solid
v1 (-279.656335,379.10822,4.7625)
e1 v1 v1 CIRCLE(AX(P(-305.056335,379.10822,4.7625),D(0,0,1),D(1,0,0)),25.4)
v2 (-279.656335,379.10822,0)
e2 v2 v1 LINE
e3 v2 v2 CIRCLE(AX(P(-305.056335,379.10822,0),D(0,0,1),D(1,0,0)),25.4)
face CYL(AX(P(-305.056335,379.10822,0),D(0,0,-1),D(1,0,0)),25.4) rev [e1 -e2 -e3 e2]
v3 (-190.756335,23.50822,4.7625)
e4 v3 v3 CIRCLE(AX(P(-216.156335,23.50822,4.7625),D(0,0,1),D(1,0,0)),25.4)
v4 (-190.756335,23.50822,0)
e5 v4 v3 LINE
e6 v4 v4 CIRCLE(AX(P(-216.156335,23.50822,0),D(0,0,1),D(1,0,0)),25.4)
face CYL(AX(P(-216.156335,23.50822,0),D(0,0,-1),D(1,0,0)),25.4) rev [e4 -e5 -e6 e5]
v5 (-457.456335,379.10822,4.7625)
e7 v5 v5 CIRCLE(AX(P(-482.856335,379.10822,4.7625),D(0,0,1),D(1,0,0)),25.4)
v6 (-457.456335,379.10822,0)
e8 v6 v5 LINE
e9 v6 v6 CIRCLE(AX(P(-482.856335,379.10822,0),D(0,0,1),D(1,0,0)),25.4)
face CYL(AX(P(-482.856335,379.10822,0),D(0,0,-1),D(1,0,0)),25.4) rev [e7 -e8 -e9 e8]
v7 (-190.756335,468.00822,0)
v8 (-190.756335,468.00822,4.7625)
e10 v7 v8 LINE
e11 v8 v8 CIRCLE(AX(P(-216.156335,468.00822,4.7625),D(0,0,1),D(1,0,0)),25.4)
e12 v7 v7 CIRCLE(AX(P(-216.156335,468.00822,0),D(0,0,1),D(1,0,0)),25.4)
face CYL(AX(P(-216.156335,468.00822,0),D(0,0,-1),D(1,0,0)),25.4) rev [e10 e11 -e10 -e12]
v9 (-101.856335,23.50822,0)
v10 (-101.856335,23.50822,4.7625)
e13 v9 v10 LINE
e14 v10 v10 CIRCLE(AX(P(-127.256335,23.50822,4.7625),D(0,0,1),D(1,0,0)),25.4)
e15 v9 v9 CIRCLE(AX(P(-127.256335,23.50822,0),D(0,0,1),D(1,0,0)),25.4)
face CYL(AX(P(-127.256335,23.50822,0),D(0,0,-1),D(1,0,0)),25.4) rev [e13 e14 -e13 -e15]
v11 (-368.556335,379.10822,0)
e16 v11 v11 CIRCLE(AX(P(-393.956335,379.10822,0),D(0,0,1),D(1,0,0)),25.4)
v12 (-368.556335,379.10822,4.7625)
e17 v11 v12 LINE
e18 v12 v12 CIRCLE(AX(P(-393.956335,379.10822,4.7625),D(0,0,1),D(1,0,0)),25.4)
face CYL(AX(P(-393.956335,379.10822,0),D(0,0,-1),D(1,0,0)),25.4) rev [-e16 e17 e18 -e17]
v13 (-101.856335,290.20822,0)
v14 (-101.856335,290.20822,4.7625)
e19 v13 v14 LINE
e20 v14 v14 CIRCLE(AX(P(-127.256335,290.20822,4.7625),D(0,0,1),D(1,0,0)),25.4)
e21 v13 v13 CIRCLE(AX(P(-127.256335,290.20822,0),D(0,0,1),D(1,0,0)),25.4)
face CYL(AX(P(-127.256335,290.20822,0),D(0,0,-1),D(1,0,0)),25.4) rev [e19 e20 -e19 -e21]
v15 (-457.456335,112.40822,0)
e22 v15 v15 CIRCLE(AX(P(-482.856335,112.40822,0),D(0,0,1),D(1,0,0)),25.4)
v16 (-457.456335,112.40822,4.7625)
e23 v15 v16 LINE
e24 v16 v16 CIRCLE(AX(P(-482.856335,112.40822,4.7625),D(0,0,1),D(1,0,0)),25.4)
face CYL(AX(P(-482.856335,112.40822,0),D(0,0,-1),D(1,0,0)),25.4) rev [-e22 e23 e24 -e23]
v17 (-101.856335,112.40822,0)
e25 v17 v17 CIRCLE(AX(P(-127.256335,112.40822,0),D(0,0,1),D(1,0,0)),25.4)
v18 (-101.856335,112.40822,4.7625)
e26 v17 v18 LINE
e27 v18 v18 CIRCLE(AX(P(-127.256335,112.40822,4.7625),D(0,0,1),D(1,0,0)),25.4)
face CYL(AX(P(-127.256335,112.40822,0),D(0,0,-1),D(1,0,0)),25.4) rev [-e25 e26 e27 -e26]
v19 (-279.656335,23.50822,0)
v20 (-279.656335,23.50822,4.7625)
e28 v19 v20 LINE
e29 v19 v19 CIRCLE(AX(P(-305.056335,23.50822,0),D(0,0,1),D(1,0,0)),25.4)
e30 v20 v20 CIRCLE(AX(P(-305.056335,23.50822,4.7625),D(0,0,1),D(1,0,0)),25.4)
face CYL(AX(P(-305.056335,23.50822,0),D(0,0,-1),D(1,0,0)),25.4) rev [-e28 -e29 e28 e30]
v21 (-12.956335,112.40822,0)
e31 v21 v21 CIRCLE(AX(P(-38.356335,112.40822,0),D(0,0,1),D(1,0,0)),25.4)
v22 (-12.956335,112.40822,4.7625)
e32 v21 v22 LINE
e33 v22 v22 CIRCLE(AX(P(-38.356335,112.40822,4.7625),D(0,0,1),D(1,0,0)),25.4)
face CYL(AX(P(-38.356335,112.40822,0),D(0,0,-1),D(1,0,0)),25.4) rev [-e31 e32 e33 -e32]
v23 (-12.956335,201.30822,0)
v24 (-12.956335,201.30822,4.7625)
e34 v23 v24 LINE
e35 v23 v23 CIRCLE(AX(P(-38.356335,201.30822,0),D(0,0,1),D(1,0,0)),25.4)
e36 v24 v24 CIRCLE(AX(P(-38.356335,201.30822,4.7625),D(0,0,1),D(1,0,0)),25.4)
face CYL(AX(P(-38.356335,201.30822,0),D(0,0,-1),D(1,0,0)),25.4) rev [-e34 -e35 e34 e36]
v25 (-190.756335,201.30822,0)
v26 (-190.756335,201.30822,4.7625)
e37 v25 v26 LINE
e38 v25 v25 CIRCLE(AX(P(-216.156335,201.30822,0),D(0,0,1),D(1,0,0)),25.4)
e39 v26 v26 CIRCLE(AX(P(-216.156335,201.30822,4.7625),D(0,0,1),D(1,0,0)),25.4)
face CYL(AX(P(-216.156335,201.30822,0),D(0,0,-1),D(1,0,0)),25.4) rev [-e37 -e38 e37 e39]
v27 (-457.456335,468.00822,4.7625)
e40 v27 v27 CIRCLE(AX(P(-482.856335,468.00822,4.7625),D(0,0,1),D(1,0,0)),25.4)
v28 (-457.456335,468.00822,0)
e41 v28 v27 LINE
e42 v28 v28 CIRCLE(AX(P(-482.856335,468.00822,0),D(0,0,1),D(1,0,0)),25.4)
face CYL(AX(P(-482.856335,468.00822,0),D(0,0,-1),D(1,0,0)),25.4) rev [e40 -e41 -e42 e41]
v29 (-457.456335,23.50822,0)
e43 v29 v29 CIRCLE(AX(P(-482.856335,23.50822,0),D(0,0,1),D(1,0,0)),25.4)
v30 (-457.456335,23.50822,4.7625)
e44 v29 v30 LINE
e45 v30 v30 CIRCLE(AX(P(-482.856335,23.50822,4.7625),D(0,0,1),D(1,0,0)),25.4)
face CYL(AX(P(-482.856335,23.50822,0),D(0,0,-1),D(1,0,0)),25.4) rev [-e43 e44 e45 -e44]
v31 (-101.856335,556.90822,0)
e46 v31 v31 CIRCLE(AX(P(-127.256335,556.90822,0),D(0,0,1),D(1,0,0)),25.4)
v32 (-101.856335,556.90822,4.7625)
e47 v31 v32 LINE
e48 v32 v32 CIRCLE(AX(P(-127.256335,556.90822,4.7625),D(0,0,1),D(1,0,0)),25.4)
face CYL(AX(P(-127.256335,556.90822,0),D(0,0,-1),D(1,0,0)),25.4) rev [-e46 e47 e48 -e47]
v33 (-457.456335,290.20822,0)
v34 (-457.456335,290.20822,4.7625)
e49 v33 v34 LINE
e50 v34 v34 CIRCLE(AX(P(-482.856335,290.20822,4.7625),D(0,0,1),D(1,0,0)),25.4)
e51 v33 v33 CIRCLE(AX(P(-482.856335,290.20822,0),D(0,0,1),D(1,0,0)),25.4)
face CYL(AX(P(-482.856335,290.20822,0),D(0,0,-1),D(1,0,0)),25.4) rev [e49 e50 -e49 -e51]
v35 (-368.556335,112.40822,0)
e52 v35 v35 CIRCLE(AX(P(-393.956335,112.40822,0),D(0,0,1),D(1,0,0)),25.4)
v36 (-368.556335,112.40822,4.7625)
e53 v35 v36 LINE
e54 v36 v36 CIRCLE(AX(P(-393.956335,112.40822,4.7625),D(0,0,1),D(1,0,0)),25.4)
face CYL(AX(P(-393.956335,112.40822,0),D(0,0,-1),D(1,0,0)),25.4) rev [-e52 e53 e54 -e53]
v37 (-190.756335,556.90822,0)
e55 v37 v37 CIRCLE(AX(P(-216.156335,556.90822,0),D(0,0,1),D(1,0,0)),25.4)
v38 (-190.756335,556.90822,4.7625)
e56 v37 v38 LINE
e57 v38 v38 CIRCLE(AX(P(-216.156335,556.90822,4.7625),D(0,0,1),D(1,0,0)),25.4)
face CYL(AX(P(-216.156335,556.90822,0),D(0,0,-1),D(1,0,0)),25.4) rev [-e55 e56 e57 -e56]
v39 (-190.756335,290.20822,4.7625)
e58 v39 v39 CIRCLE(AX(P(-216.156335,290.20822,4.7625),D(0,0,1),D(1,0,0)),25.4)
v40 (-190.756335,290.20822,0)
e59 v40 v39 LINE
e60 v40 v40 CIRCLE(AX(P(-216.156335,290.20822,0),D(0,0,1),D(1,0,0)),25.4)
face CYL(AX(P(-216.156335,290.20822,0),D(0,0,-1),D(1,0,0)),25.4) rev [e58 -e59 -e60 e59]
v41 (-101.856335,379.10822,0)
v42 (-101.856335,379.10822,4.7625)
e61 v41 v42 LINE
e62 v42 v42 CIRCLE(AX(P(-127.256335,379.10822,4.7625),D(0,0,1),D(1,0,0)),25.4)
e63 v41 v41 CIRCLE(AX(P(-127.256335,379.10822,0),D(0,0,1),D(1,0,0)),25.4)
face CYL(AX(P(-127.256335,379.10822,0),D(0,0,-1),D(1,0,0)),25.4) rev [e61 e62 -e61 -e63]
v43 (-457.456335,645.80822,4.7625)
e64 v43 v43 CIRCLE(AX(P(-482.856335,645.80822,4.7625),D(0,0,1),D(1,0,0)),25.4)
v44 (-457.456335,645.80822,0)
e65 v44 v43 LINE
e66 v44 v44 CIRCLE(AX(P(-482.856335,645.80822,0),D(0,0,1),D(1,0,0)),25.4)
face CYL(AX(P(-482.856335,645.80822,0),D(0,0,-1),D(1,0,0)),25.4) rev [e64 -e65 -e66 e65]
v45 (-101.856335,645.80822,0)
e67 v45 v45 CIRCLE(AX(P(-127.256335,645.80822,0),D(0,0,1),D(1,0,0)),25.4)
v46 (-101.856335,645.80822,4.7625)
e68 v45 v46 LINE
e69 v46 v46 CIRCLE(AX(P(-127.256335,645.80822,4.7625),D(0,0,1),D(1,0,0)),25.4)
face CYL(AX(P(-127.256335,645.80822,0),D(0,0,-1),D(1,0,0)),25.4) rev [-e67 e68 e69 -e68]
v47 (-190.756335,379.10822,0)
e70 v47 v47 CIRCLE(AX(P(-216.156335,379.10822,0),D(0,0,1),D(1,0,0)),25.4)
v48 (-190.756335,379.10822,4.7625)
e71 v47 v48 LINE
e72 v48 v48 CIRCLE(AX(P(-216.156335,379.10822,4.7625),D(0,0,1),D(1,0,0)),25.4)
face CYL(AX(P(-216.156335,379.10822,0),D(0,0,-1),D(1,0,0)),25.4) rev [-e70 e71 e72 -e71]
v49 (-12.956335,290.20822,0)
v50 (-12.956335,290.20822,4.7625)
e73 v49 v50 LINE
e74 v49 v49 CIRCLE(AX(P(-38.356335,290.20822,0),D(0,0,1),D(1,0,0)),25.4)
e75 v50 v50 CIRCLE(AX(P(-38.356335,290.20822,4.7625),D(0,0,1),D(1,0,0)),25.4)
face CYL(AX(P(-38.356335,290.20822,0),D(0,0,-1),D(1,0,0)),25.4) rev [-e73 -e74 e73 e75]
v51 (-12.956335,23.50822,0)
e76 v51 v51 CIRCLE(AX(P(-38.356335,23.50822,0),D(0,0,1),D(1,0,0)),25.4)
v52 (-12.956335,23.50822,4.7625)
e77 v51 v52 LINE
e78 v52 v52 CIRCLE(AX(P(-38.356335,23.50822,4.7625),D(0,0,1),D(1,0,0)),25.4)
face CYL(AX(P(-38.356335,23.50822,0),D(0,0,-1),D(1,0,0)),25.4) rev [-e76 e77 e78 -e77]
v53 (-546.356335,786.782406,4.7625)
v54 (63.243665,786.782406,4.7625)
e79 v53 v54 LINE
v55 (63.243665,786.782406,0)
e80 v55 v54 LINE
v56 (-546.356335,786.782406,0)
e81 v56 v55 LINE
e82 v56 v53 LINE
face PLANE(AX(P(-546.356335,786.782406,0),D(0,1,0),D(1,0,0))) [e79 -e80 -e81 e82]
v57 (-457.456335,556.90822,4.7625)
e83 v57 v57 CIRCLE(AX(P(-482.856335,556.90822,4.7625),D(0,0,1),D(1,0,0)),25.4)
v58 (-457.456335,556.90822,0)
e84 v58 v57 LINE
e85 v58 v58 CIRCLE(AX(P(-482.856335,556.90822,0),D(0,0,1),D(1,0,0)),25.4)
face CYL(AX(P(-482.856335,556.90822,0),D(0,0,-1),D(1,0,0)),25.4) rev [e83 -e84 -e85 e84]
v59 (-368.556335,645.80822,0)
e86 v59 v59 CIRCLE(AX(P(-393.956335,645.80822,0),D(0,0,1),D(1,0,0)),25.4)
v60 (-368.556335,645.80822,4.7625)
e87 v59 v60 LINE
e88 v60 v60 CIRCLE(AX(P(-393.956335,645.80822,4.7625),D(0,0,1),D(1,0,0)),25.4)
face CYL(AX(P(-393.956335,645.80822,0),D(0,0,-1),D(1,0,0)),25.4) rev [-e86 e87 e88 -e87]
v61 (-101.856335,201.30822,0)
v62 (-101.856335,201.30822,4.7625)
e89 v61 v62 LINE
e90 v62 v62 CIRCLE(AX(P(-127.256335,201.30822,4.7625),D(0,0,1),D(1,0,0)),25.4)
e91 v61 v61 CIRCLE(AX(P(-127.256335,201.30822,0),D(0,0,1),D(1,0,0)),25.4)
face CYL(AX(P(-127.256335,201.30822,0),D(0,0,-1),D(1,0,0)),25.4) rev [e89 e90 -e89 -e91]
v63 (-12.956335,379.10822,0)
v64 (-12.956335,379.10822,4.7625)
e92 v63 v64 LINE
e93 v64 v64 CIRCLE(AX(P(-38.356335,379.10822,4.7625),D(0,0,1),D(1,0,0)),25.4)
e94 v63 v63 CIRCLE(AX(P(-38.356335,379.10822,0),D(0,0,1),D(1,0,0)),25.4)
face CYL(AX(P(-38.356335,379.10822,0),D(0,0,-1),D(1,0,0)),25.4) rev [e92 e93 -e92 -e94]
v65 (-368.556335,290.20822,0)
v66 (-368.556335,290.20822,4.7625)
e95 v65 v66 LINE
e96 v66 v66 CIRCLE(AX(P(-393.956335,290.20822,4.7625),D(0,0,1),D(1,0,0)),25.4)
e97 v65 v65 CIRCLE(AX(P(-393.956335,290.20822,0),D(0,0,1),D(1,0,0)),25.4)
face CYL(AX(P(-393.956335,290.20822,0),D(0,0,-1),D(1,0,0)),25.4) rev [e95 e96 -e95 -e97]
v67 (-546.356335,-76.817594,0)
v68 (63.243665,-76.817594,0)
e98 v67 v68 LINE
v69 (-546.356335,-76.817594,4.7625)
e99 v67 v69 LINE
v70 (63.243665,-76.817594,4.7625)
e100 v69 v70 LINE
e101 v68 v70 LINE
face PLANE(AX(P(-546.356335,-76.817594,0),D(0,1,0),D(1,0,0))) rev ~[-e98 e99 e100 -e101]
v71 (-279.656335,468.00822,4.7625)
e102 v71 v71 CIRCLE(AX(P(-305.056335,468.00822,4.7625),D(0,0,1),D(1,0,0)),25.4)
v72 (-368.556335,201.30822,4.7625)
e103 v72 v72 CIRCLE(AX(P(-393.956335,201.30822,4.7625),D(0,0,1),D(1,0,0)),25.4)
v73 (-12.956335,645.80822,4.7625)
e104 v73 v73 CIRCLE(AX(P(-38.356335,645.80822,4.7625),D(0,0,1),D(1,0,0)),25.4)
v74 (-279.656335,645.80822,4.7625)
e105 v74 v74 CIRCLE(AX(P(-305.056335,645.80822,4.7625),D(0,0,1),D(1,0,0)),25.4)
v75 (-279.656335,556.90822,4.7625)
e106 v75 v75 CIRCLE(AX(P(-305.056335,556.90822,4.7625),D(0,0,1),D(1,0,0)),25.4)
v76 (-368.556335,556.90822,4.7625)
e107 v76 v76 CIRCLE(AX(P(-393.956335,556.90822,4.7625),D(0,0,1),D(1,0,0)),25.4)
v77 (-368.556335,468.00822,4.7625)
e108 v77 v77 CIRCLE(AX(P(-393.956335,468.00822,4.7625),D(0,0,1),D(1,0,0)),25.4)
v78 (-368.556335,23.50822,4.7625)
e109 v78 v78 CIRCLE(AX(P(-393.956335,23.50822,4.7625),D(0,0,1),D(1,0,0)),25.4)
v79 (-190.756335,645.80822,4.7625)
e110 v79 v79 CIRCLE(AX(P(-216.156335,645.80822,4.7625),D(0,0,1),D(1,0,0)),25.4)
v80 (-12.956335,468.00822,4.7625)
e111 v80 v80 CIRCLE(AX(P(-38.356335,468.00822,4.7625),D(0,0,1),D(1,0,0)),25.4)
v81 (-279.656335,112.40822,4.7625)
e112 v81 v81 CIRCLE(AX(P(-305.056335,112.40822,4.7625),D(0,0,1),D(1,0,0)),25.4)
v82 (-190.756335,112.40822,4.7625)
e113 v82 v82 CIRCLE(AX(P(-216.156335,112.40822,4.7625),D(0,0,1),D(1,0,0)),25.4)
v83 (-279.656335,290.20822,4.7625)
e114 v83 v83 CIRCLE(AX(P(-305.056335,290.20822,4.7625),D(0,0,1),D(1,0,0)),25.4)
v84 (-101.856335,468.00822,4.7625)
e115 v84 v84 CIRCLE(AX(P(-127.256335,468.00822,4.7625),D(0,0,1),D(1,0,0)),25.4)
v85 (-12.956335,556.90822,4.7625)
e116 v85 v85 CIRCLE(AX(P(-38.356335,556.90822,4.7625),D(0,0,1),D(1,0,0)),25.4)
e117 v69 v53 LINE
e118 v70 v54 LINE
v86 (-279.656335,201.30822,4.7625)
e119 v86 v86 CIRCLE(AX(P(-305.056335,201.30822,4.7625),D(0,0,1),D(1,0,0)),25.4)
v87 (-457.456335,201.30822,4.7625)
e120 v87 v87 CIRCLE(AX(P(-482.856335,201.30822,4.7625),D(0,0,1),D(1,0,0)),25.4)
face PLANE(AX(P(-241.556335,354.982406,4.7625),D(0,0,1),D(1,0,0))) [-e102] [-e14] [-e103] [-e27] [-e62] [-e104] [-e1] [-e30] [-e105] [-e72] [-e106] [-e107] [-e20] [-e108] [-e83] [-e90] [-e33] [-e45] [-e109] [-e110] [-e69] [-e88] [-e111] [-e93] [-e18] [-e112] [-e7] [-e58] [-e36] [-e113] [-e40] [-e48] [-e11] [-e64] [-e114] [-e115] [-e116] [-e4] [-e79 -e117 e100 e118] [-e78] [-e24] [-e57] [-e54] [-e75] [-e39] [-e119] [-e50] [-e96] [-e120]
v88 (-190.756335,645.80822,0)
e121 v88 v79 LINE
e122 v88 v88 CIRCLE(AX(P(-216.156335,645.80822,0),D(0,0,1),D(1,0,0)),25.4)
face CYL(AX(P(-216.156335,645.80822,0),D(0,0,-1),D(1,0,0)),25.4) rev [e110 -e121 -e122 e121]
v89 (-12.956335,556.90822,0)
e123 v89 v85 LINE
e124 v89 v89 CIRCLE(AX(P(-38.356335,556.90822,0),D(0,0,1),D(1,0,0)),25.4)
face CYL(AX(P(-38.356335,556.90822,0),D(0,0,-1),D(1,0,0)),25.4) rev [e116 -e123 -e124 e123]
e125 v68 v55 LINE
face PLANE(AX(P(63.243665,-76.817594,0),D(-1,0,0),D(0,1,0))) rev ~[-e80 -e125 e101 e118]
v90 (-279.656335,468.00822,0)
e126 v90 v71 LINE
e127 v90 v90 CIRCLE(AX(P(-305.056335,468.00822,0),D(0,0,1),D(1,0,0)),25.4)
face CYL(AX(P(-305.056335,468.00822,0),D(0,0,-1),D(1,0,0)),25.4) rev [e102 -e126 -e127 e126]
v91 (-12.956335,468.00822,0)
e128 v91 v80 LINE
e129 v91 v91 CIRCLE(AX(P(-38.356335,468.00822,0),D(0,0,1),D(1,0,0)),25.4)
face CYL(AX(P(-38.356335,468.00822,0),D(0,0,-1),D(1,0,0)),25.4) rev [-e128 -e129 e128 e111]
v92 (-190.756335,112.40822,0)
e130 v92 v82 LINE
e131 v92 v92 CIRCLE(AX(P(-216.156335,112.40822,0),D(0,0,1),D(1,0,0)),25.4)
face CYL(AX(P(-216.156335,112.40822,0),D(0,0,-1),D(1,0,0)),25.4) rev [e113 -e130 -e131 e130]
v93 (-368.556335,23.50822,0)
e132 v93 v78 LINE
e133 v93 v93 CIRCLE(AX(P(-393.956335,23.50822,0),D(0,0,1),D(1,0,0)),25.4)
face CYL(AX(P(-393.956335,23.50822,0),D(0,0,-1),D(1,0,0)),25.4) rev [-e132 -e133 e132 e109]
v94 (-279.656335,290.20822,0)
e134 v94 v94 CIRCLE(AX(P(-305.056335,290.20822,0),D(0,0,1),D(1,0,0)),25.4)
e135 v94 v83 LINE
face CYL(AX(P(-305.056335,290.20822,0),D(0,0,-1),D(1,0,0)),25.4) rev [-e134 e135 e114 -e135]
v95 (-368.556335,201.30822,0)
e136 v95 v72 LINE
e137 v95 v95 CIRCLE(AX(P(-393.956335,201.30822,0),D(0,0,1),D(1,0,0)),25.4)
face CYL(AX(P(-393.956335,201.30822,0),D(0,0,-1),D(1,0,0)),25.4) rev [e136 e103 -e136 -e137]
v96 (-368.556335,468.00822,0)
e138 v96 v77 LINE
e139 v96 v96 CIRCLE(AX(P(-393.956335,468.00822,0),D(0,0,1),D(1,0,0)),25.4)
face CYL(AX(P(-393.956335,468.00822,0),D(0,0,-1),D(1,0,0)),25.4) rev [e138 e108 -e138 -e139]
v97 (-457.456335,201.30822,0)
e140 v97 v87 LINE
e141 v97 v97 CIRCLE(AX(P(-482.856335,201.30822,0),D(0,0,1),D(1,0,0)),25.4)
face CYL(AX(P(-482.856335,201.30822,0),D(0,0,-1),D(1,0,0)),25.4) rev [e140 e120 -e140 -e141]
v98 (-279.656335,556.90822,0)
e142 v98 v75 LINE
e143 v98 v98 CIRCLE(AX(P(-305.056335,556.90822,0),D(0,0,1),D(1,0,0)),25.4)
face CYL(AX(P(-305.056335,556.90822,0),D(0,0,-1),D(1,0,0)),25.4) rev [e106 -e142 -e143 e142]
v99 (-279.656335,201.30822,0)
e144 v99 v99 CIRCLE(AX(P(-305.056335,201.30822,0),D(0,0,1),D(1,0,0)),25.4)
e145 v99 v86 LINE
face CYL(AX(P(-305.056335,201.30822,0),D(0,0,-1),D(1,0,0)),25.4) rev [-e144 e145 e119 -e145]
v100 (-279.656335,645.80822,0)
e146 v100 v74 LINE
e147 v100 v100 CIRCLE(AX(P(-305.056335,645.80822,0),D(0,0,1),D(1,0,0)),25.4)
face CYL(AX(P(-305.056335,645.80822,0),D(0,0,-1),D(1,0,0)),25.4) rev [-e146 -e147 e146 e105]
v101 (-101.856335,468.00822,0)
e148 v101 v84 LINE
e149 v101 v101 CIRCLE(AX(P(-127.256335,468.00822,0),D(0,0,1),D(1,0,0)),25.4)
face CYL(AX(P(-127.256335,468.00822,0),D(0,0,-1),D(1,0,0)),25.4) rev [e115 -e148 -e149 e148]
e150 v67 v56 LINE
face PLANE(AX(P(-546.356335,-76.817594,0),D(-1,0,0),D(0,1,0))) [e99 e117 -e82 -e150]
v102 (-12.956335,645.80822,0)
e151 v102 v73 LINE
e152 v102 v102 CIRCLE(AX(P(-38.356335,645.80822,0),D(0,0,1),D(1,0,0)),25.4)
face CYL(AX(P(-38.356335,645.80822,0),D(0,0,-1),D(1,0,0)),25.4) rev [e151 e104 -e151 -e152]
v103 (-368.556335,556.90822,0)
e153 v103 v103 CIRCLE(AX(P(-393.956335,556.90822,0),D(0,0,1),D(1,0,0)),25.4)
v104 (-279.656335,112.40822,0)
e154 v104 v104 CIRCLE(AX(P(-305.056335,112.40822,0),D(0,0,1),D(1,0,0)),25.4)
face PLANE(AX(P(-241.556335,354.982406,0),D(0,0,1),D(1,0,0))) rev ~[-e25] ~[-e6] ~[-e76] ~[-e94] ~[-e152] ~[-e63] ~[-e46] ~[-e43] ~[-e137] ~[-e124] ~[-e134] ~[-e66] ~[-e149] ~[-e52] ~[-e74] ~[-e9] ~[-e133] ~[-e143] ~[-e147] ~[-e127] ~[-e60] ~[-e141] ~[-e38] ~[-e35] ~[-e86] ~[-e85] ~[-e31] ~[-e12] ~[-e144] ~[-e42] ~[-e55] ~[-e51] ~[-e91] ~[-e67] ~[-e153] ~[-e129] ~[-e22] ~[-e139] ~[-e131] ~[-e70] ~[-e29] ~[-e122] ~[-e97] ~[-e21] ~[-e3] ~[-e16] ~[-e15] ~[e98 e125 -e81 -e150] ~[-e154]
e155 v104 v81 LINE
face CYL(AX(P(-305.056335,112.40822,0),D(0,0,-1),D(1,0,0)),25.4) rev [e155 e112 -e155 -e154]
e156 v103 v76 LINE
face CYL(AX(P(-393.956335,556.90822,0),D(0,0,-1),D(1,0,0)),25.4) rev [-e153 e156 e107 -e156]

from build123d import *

# Parameters (mm, degrees)
F0_W     = 609.6
F0_H     = 863.6
F0_R     = 25.4
F1_DEPTH = 4.7625


# Not quite as in the source:
# - a length typed as a fraction of an inch, garbled in the dataset ("3 / 203.2 mm" for 3/8 in), is restored


with BuildPart() as f1:
    # F0 (on Top) → F1 (new body)
    with BuildSketch(Plane.XY):
        with Locations((-241.5563351989, 354.9824055314)):
            Rectangle(F0_W, F0_H)
        with Locations((-482.8563351989, 23.5082199097)):
            Circle(F0_R, mode=Mode.SUBTRACT)
        with Locations((-393.9563351989, 23.5082199097)):
            Circle(F0_R, mode=Mode.SUBTRACT)
        with Locations((-482.8563351989, 112.4082199097)):
            Circle(F0_R, mode=Mode.SUBTRACT)
        with Locations((-393.9563351989, 112.4082199097)):
            Circle(F0_R, mode=Mode.SUBTRACT)
        with Locations((-305.0563351989, 23.5082199097)):
            Circle(F0_R, mode=Mode.SUBTRACT)
        with Locations((-305.0563351989, 112.4082199097)):
            Circle(F0_R, mode=Mode.SUBTRACT)
        with Locations((-482.8563351989, 201.3082199097)):
            Circle(F0_R, mode=Mode.SUBTRACT)
        with Locations((-393.9563351989, 201.3082199097)):
            Circle(F0_R, mode=Mode.SUBTRACT)
        with Locations((-482.8563351989, 290.2082199097)):
            Circle(F0_R, mode=Mode.SUBTRACT)
        with Locations((-393.9563351989, 290.2082199097)):
            Circle(F0_R, mode=Mode.SUBTRACT)
        with Locations((-305.0563351989, 201.3082199097)):
            Circle(F0_R, mode=Mode.SUBTRACT)
        with Locations((-305.0563351989, 290.2082199097)):
            Circle(F0_R, mode=Mode.SUBTRACT)
        with Locations((-216.1563351989, 23.5082199097)):
            Circle(F0_R, mode=Mode.SUBTRACT)
        with Locations((-127.2563351989, 23.5082199097)):
            Circle(F0_R, mode=Mode.SUBTRACT)
        with Locations((-216.1563351989, 112.4082199097)):
            Circle(F0_R, mode=Mode.SUBTRACT)
        with Locations((-127.2563351989, 112.4082199097)):
            Circle(F0_R, mode=Mode.SUBTRACT)
        with Locations((-38.3563351989, 23.5082199097)):
            Circle(F0_R, mode=Mode.SUBTRACT)
        with Locations((-38.3563351989, 112.4082199097)):
            Circle(F0_R, mode=Mode.SUBTRACT)
        with Locations((-216.1563351989, 201.3082199097)):
            Circle(F0_R, mode=Mode.SUBTRACT)
        with Locations((-127.2563351989, 201.3082199097)):
            Circle(F0_R, mode=Mode.SUBTRACT)
        with Locations((-216.1563351989, 290.2082199097)):
            Circle(F0_R, mode=Mode.SUBTRACT)
        with Locations((-127.2563351989, 290.2082199097)):
            Circle(F0_R, mode=Mode.SUBTRACT)
        with Locations((-38.3563351989, 201.3082199097)):
            Circle(F0_R, mode=Mode.SUBTRACT)
        with Locations((-38.3563351989, 290.2082199097)):
            Circle(F0_R, mode=Mode.SUBTRACT)
        with Locations((-482.8563351989, 379.1082199097)):
            Circle(F0_R, mode=Mode.SUBTRACT)
        with Locations((-393.9563351989, 379.1082199097)):
            Circle(F0_R, mode=Mode.SUBTRACT)
        with Locations((-482.8563351989, 468.0082199097)):
            Circle(F0_R, mode=Mode.SUBTRACT)
        with Locations((-482.8563351989, 556.9082199097)):
            Circle(F0_R, mode=Mode.SUBTRACT)
        with Locations((-393.9563351989, 468.0082199097)):
            Circle(F0_R, mode=Mode.SUBTRACT)
        with Locations((-393.9563351989, 556.9082199097)):
            Circle(F0_R, mode=Mode.SUBTRACT)
        with Locations((-305.0563351989, 379.1082199097)):
            Circle(F0_R, mode=Mode.SUBTRACT)
        with Locations((-305.0563351989, 468.0082199097)):
            Circle(F0_R, mode=Mode.SUBTRACT)
        with Locations((-305.0563351989, 556.9082199097)):
            Circle(F0_R, mode=Mode.SUBTRACT)
        with Locations((-482.8563351989, 645.8082199097)):
            Circle(F0_R, mode=Mode.SUBTRACT)
        with Locations((-393.9563351989, 645.8082199097)):
            Circle(F0_R, mode=Mode.SUBTRACT)
        with Locations((-305.0563351989, 645.8082199097)):
            Circle(F0_R, mode=Mode.SUBTRACT)
        with Locations((-216.1563351989, 379.1082199097)):
            Circle(F0_R, mode=Mode.SUBTRACT)
        with Locations((-127.2563351989, 379.1082199097)):
            Circle(F0_R, mode=Mode.SUBTRACT)
        with Locations((-216.1563351989, 468.0082199097)):
            Circle(F0_R, mode=Mode.SUBTRACT)
        with Locations((-216.1563351989, 556.9082199097)):
            Circle(F0_R, mode=Mode.SUBTRACT)
        with Locations((-127.2563351989, 468.0082199097)):
            Circle(F0_R, mode=Mode.SUBTRACT)
        with Locations((-127.2563351989, 556.9082199097)):
            Circle(F0_R, mode=Mode.SUBTRACT)
        with Locations((-38.3563351989, 379.1082199097)):
            Circle(F0_R, mode=Mode.SUBTRACT)
        with Locations((-38.3563351989, 468.0082199097)):
            Circle(F0_R, mode=Mode.SUBTRACT)
        with Locations((-38.3563351989, 556.9082199097)):
            Circle(F0_R, mode=Mode.SUBTRACT)
        with Locations((-216.1563351989, 645.8082199097)):
            Circle(F0_R, mode=Mode.SUBTRACT)
        with Locations((-127.2563351989, 645.8082199097)):
            Circle(F0_R, mode=Mode.SUBTRACT)
        with Locations((-38.3563351989, 645.8082199097)):
            Circle(F0_R, mode=Mode.SUBTRACT)
    extrude(amount=F1_DEPTH)


solid = f1.part
